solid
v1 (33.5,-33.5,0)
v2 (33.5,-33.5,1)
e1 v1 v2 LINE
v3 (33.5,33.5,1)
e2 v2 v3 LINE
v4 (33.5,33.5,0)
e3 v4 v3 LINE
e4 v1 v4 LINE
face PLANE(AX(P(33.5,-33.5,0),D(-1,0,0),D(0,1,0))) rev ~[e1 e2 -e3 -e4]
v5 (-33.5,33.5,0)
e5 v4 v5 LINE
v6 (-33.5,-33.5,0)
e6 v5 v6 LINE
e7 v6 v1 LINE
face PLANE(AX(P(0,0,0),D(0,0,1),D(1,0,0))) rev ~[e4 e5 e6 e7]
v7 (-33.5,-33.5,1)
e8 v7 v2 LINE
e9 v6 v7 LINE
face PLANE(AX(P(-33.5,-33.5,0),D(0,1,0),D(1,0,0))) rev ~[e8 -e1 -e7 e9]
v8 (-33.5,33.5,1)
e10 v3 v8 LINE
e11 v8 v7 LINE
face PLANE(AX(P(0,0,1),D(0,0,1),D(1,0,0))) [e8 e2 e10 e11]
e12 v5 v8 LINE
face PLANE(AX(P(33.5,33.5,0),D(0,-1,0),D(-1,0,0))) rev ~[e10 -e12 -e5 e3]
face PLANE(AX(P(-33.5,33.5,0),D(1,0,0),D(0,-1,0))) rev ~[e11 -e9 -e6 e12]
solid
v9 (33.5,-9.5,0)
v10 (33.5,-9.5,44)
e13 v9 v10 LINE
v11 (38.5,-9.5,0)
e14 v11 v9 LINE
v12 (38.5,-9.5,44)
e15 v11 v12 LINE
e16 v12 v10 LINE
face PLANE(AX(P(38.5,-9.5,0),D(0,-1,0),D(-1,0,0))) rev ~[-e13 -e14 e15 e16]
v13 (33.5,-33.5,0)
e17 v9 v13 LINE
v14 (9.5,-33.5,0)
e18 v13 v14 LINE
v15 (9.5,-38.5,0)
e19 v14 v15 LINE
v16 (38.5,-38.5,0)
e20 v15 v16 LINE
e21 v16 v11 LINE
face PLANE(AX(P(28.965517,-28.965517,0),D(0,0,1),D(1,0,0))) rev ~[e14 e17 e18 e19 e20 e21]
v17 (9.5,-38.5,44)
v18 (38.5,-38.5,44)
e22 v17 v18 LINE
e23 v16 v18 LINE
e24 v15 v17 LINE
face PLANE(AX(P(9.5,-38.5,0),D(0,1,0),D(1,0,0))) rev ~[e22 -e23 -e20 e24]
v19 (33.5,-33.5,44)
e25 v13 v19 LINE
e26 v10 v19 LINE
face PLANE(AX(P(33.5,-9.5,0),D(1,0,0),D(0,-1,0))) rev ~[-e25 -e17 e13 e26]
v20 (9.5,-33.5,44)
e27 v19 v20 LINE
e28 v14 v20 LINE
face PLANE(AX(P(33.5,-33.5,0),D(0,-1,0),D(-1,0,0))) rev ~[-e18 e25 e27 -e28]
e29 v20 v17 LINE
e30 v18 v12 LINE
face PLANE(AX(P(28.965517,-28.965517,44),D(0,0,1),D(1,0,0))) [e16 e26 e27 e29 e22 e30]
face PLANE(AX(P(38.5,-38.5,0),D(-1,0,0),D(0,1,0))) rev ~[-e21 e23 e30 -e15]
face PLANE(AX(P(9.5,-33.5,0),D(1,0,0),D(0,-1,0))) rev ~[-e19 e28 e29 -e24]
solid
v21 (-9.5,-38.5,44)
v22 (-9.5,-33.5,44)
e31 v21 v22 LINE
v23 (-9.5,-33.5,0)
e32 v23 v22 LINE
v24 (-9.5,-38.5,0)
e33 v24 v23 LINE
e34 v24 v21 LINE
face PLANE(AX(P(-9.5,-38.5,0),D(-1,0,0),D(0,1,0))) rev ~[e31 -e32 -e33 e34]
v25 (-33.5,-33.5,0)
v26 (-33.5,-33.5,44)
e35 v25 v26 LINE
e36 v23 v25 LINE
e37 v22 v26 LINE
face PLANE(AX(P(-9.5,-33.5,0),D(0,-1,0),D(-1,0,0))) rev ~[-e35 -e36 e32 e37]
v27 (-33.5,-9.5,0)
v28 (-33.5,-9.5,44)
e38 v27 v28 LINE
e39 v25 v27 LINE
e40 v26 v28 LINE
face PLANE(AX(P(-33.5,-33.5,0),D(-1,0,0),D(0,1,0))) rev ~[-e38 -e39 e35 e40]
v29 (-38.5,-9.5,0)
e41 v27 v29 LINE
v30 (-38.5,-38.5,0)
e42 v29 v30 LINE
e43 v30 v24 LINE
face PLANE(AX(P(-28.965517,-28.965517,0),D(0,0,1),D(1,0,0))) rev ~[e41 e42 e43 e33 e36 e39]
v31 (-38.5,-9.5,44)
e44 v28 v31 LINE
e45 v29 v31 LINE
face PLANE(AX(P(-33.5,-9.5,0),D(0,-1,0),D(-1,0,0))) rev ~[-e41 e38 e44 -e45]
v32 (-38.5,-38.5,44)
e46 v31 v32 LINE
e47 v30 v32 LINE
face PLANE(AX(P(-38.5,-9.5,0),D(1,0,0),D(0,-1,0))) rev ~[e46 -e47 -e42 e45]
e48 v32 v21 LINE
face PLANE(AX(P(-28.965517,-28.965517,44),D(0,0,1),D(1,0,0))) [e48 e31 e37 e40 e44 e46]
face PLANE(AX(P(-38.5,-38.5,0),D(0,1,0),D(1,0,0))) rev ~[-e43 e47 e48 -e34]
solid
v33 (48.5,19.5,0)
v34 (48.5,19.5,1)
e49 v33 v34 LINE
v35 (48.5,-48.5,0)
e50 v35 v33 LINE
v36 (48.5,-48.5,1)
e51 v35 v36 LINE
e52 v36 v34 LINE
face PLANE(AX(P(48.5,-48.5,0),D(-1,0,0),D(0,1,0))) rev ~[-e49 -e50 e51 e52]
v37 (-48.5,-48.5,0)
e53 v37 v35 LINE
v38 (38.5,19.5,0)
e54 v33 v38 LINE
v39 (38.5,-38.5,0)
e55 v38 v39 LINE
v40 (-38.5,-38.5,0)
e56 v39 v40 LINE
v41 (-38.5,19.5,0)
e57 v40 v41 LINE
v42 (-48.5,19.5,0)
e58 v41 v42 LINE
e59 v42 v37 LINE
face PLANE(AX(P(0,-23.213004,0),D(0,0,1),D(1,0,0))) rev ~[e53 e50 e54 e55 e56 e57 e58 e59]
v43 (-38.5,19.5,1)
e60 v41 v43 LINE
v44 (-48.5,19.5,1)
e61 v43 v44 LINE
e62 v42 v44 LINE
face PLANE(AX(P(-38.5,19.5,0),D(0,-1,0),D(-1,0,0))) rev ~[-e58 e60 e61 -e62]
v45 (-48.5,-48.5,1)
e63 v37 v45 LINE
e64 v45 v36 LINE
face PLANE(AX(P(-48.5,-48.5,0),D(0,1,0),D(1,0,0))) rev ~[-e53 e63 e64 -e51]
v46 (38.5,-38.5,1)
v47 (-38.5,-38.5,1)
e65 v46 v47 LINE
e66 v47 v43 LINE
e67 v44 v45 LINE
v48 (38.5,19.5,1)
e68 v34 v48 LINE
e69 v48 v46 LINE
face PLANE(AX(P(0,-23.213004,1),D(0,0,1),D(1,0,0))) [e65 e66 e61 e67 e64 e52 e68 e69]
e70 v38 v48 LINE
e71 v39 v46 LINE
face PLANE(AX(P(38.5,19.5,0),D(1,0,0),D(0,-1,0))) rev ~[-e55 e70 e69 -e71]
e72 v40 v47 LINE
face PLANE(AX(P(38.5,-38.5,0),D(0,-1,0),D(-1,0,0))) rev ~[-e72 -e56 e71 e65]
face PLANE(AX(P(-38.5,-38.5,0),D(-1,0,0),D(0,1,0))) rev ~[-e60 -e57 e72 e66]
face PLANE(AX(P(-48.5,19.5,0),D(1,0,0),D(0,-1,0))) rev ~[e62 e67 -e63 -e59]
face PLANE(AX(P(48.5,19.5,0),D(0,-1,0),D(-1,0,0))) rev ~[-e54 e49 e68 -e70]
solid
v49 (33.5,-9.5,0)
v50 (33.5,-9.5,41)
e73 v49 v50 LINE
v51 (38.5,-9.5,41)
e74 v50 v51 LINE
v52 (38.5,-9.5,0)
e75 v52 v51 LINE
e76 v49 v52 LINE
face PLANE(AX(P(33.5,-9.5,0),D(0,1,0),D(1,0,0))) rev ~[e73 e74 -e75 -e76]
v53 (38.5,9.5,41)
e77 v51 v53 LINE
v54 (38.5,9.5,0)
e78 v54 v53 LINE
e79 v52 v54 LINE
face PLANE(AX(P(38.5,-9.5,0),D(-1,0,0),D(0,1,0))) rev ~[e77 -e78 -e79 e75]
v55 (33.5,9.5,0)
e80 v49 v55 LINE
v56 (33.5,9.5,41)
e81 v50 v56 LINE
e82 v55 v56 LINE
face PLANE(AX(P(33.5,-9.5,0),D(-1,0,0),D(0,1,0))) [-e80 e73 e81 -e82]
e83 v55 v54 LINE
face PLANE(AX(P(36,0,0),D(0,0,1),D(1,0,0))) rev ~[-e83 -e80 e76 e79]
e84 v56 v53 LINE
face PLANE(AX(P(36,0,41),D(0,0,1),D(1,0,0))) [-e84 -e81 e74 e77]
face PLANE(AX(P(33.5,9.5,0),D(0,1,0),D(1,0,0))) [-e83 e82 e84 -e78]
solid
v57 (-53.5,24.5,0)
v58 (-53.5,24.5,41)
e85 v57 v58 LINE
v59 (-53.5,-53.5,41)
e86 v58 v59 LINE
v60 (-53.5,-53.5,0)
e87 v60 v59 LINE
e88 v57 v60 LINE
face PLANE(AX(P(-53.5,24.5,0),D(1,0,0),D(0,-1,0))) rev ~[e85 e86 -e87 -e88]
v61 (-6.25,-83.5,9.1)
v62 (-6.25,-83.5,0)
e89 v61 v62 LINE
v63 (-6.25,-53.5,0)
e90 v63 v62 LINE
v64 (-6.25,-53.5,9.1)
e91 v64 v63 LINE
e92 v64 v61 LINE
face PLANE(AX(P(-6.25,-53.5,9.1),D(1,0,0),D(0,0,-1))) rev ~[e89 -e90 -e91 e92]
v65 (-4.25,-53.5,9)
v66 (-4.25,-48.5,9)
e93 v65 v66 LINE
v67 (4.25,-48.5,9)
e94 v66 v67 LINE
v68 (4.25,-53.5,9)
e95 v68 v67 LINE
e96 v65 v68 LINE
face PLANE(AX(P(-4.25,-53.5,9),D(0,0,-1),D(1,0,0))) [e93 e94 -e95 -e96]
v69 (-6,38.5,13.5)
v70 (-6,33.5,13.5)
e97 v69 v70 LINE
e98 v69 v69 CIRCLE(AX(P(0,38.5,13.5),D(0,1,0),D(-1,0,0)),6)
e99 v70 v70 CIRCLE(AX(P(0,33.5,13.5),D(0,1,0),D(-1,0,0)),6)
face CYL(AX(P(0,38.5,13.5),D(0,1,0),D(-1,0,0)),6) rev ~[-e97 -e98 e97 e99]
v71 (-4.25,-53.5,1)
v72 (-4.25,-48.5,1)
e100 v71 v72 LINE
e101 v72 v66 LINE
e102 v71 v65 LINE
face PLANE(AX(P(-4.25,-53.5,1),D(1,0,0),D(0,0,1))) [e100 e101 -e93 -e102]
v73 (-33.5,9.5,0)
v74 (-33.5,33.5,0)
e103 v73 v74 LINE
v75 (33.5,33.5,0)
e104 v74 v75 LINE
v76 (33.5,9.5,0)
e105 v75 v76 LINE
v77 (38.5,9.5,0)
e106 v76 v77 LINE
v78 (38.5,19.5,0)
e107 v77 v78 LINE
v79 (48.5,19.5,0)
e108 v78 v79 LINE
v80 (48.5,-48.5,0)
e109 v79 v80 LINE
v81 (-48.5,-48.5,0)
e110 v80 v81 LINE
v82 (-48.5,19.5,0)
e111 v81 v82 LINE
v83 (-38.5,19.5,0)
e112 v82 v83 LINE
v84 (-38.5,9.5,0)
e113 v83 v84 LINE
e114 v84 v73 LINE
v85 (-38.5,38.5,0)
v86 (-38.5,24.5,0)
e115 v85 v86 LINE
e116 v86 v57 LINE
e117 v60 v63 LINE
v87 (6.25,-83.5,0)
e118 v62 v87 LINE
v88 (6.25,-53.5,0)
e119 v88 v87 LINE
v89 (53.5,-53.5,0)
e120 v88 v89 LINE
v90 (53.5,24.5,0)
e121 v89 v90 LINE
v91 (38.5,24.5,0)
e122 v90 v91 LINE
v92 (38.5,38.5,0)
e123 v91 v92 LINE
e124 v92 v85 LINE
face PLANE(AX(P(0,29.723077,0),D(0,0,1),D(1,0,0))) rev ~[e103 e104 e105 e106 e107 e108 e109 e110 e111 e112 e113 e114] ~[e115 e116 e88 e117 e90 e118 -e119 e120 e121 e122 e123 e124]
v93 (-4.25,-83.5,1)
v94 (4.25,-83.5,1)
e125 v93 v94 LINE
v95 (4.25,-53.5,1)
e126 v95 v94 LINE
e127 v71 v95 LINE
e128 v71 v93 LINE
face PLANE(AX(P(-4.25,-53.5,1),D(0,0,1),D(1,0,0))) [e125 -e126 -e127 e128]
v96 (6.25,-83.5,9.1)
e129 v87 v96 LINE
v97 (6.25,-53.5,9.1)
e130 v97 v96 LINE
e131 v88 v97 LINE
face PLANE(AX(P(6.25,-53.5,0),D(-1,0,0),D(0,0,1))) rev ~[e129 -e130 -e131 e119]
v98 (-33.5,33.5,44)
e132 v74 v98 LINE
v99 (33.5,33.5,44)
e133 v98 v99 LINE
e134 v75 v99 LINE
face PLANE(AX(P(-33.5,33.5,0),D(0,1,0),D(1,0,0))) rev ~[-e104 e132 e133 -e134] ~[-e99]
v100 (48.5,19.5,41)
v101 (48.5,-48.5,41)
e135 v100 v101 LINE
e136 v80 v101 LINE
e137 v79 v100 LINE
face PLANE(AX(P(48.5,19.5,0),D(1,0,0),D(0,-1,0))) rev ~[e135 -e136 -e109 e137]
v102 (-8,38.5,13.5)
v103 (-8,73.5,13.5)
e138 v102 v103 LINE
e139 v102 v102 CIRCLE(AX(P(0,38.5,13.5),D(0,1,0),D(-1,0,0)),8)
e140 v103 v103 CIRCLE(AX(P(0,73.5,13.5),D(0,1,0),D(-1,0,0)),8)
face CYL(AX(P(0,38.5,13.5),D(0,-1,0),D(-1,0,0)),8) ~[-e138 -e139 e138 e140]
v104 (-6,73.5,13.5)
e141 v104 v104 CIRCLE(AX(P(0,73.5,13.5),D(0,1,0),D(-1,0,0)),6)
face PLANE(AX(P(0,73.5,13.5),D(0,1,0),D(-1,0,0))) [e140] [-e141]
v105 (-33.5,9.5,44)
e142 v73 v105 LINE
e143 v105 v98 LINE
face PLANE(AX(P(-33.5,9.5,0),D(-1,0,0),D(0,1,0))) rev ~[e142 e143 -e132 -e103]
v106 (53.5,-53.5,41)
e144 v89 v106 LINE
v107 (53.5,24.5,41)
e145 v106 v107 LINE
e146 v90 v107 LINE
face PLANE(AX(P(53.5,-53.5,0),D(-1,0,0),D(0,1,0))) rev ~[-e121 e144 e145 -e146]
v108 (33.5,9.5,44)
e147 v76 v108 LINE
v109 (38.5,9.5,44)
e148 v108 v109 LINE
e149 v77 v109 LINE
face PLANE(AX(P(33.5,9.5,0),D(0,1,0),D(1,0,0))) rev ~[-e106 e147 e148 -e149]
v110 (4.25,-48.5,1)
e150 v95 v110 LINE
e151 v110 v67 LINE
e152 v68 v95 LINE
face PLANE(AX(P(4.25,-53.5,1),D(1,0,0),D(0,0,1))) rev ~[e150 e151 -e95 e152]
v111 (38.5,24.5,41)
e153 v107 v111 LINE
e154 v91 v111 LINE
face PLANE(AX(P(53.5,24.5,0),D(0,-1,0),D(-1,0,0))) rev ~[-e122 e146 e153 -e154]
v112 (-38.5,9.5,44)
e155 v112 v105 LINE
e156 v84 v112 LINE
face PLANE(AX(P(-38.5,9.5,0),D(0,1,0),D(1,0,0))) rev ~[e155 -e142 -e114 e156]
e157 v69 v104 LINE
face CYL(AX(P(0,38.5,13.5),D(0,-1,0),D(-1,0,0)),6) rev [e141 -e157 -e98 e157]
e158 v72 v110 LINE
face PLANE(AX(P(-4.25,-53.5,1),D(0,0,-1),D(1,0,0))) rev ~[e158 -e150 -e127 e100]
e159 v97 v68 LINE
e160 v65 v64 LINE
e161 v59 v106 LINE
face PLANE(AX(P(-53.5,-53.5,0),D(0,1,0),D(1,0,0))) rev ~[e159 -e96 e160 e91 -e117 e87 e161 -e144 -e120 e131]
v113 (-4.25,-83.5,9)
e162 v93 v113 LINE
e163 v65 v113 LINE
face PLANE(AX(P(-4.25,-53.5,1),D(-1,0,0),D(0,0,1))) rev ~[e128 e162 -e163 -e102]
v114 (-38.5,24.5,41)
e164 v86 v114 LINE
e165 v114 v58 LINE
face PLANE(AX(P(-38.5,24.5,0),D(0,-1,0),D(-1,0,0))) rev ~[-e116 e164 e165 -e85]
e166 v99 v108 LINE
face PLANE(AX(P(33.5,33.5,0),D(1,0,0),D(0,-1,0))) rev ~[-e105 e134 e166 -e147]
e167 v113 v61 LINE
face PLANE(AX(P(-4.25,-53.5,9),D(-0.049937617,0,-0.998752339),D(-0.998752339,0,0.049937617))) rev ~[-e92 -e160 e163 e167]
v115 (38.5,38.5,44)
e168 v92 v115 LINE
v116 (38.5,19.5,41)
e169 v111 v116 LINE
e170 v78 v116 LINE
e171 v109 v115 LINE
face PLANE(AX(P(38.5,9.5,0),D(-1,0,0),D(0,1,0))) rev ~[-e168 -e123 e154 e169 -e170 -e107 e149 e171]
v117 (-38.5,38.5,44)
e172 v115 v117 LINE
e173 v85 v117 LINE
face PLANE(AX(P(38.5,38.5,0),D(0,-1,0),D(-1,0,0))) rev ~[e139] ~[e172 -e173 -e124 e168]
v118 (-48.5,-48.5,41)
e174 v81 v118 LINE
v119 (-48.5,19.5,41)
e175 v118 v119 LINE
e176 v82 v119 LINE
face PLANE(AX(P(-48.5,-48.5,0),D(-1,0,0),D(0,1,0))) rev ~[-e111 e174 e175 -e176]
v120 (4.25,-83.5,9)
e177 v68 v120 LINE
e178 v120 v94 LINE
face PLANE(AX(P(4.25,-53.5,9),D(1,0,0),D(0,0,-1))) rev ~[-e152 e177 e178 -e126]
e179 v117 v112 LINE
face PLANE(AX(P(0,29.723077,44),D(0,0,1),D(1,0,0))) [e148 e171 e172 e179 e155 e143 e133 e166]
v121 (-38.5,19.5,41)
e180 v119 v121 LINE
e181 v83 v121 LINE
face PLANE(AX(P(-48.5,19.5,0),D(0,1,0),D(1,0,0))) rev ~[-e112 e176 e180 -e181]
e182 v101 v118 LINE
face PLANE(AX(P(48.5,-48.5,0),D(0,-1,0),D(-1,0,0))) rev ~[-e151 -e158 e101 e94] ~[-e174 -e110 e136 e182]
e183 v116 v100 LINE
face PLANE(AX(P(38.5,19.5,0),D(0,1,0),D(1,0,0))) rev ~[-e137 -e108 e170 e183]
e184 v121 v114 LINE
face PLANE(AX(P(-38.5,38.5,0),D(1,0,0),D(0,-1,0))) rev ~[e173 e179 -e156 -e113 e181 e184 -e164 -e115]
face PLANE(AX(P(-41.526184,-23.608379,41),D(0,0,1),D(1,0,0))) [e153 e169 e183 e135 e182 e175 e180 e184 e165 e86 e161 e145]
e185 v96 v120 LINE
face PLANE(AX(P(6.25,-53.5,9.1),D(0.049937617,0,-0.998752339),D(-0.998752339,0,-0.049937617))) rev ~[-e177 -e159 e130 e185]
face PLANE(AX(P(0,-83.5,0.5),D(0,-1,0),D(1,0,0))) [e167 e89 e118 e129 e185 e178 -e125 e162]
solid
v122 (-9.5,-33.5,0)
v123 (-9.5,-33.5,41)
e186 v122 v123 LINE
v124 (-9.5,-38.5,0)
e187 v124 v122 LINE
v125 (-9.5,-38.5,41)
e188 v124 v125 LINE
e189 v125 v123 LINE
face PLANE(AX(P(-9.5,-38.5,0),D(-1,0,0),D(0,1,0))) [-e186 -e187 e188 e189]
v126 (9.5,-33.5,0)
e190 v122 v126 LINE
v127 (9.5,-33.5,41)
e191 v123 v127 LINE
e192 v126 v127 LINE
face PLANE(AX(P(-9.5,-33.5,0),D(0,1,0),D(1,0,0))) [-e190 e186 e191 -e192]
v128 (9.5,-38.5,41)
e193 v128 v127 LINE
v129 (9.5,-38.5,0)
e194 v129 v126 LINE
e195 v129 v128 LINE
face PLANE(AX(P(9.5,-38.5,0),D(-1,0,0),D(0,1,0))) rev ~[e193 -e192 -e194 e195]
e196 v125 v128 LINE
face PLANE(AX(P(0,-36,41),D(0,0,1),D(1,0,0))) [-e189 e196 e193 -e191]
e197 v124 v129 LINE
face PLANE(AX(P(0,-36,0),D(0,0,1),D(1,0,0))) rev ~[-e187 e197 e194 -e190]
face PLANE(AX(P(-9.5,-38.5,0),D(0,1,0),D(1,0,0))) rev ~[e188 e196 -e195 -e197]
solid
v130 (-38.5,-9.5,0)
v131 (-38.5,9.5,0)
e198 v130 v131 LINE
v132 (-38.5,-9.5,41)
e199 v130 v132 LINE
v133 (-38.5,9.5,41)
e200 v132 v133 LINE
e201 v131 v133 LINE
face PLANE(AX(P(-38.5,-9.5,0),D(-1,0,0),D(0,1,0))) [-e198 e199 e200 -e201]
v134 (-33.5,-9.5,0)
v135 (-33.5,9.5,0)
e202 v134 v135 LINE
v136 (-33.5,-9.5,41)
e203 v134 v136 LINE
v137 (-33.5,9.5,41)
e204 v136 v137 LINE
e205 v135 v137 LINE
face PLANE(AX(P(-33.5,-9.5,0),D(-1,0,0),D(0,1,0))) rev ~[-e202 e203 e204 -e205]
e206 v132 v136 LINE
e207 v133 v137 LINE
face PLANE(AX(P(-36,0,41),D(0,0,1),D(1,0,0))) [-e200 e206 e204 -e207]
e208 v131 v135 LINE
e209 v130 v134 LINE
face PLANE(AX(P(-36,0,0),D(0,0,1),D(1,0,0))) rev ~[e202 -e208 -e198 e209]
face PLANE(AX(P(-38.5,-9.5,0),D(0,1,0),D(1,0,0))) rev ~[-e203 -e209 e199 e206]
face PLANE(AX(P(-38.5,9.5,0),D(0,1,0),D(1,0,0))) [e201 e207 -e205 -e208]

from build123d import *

# Parameters (mm, degrees)
F1_DEPTH  = 44
F0_W      = 5
F0_H      = 19
F2_DEPTH  = 41
F0_W_2    = 19
F0_H_2    = 5
F0_W_3    = 8.5
F3_DEPTH  = 41
F4_DEPTH  = 1
F5_R      = 8
F5_R_2    = 6
F6_DEPTH  = 35
F7_DEPTH  = 25
F8_W      = 8.5
F8_H      = 1
F8_W_2    = 2
F9_DEPTH  = 30
F8_H_2    = 8
F10_DEPTH = 25


with BuildPart() as f1:
    # F0 (on Top) → F1 (new body)
    with BuildSketch(Plane.XY):
        Polygon((-33.5, 33.5), (33.5, 33.5), (33.5, 9.5), (38.5, 9.5), (38.5, 19.5), (38.5, 24.5), (38.5, 38.5), (6, 38.5), (-6, 38.5), (-38.5, 38.5), (-38.5, 24.5), (-38.5, 19.5), (-38.5, 9.5), (-33.5, 9.5), align=None)
    extrude(amount=F1_DEPTH)

    # F0 (on Top) → F3 (join)
    with BuildSketch(Plane.XY):
        Polygon((-48.5, 19.5), (-38.5, 19.5), (-38.5, 24.5), (-53.5, 24.5), (-53.5, 19.5), (-53.5, -53.5), (-4.25, -53.5), (-4.25, -48.5), (-48.5, -48.5), align=None)
        Polygon((38.5, 24.5), (38.5, 19.5), (48.5, 19.5), (48.5, -48.5), (4.25, -48.5), (4.25, -53.5), (53.5, -53.5), (53.5, 19.5), (53.5, 24.5), align=None)
        with Locations((0, -51)):
            Rectangle(F0_W_3, F0_H_2)
    extrude(amount=F3_DEPTH)

    # F5 (on face) → F6 (join)
    with BuildSketch(Plane(origin=(0, 38.5, 0), x_dir=(-1, 0, 0), z_dir=(0, 1, 0))):
        with Locations((0, 13.5)):
            Circle(F5_R)
        with Locations((0, 13.5)):
            Circle(F5_R_2, mode=Mode.SUBTRACT)
    extrude(amount=F6_DEPTH)

    # F7 (cut): a face of the model
    f7_faces = [f1.faces().sort_by_distance(p)[0] for p in [
        (0, 38.5, 13.5),
    ]]
    extrude(f7_faces, amount=-F7_DEPTH, mode=Mode.SUBTRACT)

    # F8 (on face) → F9 (join)
    with BuildSketch(Plane.XZ.offset(53.5)):
        with Locations((0, 0.5)):
            Rectangle(F8_W, F8_H)
        Polygon((4.25, 9), (4.25, 1), (6.25, 1), (6.25, 9.1), align=None)
        Polygon((-6.25, 1), (-4.25, 1), (-4.25, 9), (-6.25, 9.1), align=None)
        with Locations((5.25, 0.5)):
            Rectangle(F8_W_2, F8_H)
        with Locations((-5.25, 0.5)):
            Rectangle(F8_W_2, F8_H)
    extrude(amount=F9_DEPTH)

    # F8 (on face) → F10 (cut)
    with BuildSketch(Plane.XZ.offset(53.5)):
        with Locations((0, 5)):
            Rectangle(F8_W, F8_H_2)
    extrude(amount=-F10_DEPTH, mode=Mode.SUBTRACT)


with BuildPart() as f1b:
    # F0 (on Top) → F1, piece 2 (new body)
    with BuildSketch(Plane.XY):
        Polygon((-33.5, -33.5), (-33.5, -9.5), (-38.5, -9.5), (-38.5, -38.5), (-9.5, -38.5), (-9.5, -33.5), align=None)
    extrude(amount=F1_DEPTH)


with BuildPart() as f1c:
    # F0 (on Top) → F1, piece 3 (new body)
    with BuildSketch(Plane.XY):
        Polygon((38.5, -9.5), (33.5, -9.5), (33.5, -33.5), (9.5, -33.5), (9.5, -38.5), (38.5, -38.5), align=None)
    extrude(amount=F1_DEPTH)


with BuildPart() as f2:
    # F0 (on Top) → F2 (new body)
    with BuildSketch(Plane.XY):
        with Locations((-36, 0)):
            Rectangle(F0_W, F0_H)
    extrude(amount=F2_DEPTH)


with BuildPart() as f2b:
    # F0 (on Top) → F2, piece 2 (new body)
    with BuildSketch(Plane.XY):
        with Locations((36, 0)):
            Rectangle(F0_W, F0_H)
    extrude(amount=F2_DEPTH)


with BuildPart() as f2c:
    # F0 (on Top) → F2, piece 3 (new body)
    with BuildSketch(Plane.XY):
        with Locations((0, -36)):
            Rectangle(F0_W_2, F0_H_2)
    extrude(amount=F2_DEPTH)


with BuildPart() as f4:
    # F0 (on Top) → F4 (new body)
    with BuildSketch(Plane.XY):
        Polygon((33.5, 9.5), (33.5, 33.5), (-33.5, 33.5), (-33.5, 9.5), (-33.5, -9.5), (-33.5, -33.5), (-9.5, -33.5), (9.5, -33.5), (33.5, -33.5), (33.5, -9.5), align=None)
    extrude(amount=F4_DEPTH)


with BuildPart() as f4b:
    # F0 (on Top) → F4, piece 2 (new body)
    with BuildSketch(Plane.XY):
        Polygon((38.5, 19.5), (38.5, 9.5), (38.5, -9.5), (38.5, -38.5), (9.5, -38.5), (-9.5, -38.5), (-38.5, -38.5), (-38.5, -9.5), (-38.5, 9.5), (-38.5, 19.5), (-48.5, 19.5), (-48.5, -48.5), (-4.25, -48.5), (4.25, -48.5), (48.5, -48.5), (48.5, 19.5), align=None)
    extrude(amount=F4_DEPTH)


solid = Compound([f1.part, f1b.part, f1c.part, f2.part, f2b.part, f2c.part, f4.part, f4b.part])
